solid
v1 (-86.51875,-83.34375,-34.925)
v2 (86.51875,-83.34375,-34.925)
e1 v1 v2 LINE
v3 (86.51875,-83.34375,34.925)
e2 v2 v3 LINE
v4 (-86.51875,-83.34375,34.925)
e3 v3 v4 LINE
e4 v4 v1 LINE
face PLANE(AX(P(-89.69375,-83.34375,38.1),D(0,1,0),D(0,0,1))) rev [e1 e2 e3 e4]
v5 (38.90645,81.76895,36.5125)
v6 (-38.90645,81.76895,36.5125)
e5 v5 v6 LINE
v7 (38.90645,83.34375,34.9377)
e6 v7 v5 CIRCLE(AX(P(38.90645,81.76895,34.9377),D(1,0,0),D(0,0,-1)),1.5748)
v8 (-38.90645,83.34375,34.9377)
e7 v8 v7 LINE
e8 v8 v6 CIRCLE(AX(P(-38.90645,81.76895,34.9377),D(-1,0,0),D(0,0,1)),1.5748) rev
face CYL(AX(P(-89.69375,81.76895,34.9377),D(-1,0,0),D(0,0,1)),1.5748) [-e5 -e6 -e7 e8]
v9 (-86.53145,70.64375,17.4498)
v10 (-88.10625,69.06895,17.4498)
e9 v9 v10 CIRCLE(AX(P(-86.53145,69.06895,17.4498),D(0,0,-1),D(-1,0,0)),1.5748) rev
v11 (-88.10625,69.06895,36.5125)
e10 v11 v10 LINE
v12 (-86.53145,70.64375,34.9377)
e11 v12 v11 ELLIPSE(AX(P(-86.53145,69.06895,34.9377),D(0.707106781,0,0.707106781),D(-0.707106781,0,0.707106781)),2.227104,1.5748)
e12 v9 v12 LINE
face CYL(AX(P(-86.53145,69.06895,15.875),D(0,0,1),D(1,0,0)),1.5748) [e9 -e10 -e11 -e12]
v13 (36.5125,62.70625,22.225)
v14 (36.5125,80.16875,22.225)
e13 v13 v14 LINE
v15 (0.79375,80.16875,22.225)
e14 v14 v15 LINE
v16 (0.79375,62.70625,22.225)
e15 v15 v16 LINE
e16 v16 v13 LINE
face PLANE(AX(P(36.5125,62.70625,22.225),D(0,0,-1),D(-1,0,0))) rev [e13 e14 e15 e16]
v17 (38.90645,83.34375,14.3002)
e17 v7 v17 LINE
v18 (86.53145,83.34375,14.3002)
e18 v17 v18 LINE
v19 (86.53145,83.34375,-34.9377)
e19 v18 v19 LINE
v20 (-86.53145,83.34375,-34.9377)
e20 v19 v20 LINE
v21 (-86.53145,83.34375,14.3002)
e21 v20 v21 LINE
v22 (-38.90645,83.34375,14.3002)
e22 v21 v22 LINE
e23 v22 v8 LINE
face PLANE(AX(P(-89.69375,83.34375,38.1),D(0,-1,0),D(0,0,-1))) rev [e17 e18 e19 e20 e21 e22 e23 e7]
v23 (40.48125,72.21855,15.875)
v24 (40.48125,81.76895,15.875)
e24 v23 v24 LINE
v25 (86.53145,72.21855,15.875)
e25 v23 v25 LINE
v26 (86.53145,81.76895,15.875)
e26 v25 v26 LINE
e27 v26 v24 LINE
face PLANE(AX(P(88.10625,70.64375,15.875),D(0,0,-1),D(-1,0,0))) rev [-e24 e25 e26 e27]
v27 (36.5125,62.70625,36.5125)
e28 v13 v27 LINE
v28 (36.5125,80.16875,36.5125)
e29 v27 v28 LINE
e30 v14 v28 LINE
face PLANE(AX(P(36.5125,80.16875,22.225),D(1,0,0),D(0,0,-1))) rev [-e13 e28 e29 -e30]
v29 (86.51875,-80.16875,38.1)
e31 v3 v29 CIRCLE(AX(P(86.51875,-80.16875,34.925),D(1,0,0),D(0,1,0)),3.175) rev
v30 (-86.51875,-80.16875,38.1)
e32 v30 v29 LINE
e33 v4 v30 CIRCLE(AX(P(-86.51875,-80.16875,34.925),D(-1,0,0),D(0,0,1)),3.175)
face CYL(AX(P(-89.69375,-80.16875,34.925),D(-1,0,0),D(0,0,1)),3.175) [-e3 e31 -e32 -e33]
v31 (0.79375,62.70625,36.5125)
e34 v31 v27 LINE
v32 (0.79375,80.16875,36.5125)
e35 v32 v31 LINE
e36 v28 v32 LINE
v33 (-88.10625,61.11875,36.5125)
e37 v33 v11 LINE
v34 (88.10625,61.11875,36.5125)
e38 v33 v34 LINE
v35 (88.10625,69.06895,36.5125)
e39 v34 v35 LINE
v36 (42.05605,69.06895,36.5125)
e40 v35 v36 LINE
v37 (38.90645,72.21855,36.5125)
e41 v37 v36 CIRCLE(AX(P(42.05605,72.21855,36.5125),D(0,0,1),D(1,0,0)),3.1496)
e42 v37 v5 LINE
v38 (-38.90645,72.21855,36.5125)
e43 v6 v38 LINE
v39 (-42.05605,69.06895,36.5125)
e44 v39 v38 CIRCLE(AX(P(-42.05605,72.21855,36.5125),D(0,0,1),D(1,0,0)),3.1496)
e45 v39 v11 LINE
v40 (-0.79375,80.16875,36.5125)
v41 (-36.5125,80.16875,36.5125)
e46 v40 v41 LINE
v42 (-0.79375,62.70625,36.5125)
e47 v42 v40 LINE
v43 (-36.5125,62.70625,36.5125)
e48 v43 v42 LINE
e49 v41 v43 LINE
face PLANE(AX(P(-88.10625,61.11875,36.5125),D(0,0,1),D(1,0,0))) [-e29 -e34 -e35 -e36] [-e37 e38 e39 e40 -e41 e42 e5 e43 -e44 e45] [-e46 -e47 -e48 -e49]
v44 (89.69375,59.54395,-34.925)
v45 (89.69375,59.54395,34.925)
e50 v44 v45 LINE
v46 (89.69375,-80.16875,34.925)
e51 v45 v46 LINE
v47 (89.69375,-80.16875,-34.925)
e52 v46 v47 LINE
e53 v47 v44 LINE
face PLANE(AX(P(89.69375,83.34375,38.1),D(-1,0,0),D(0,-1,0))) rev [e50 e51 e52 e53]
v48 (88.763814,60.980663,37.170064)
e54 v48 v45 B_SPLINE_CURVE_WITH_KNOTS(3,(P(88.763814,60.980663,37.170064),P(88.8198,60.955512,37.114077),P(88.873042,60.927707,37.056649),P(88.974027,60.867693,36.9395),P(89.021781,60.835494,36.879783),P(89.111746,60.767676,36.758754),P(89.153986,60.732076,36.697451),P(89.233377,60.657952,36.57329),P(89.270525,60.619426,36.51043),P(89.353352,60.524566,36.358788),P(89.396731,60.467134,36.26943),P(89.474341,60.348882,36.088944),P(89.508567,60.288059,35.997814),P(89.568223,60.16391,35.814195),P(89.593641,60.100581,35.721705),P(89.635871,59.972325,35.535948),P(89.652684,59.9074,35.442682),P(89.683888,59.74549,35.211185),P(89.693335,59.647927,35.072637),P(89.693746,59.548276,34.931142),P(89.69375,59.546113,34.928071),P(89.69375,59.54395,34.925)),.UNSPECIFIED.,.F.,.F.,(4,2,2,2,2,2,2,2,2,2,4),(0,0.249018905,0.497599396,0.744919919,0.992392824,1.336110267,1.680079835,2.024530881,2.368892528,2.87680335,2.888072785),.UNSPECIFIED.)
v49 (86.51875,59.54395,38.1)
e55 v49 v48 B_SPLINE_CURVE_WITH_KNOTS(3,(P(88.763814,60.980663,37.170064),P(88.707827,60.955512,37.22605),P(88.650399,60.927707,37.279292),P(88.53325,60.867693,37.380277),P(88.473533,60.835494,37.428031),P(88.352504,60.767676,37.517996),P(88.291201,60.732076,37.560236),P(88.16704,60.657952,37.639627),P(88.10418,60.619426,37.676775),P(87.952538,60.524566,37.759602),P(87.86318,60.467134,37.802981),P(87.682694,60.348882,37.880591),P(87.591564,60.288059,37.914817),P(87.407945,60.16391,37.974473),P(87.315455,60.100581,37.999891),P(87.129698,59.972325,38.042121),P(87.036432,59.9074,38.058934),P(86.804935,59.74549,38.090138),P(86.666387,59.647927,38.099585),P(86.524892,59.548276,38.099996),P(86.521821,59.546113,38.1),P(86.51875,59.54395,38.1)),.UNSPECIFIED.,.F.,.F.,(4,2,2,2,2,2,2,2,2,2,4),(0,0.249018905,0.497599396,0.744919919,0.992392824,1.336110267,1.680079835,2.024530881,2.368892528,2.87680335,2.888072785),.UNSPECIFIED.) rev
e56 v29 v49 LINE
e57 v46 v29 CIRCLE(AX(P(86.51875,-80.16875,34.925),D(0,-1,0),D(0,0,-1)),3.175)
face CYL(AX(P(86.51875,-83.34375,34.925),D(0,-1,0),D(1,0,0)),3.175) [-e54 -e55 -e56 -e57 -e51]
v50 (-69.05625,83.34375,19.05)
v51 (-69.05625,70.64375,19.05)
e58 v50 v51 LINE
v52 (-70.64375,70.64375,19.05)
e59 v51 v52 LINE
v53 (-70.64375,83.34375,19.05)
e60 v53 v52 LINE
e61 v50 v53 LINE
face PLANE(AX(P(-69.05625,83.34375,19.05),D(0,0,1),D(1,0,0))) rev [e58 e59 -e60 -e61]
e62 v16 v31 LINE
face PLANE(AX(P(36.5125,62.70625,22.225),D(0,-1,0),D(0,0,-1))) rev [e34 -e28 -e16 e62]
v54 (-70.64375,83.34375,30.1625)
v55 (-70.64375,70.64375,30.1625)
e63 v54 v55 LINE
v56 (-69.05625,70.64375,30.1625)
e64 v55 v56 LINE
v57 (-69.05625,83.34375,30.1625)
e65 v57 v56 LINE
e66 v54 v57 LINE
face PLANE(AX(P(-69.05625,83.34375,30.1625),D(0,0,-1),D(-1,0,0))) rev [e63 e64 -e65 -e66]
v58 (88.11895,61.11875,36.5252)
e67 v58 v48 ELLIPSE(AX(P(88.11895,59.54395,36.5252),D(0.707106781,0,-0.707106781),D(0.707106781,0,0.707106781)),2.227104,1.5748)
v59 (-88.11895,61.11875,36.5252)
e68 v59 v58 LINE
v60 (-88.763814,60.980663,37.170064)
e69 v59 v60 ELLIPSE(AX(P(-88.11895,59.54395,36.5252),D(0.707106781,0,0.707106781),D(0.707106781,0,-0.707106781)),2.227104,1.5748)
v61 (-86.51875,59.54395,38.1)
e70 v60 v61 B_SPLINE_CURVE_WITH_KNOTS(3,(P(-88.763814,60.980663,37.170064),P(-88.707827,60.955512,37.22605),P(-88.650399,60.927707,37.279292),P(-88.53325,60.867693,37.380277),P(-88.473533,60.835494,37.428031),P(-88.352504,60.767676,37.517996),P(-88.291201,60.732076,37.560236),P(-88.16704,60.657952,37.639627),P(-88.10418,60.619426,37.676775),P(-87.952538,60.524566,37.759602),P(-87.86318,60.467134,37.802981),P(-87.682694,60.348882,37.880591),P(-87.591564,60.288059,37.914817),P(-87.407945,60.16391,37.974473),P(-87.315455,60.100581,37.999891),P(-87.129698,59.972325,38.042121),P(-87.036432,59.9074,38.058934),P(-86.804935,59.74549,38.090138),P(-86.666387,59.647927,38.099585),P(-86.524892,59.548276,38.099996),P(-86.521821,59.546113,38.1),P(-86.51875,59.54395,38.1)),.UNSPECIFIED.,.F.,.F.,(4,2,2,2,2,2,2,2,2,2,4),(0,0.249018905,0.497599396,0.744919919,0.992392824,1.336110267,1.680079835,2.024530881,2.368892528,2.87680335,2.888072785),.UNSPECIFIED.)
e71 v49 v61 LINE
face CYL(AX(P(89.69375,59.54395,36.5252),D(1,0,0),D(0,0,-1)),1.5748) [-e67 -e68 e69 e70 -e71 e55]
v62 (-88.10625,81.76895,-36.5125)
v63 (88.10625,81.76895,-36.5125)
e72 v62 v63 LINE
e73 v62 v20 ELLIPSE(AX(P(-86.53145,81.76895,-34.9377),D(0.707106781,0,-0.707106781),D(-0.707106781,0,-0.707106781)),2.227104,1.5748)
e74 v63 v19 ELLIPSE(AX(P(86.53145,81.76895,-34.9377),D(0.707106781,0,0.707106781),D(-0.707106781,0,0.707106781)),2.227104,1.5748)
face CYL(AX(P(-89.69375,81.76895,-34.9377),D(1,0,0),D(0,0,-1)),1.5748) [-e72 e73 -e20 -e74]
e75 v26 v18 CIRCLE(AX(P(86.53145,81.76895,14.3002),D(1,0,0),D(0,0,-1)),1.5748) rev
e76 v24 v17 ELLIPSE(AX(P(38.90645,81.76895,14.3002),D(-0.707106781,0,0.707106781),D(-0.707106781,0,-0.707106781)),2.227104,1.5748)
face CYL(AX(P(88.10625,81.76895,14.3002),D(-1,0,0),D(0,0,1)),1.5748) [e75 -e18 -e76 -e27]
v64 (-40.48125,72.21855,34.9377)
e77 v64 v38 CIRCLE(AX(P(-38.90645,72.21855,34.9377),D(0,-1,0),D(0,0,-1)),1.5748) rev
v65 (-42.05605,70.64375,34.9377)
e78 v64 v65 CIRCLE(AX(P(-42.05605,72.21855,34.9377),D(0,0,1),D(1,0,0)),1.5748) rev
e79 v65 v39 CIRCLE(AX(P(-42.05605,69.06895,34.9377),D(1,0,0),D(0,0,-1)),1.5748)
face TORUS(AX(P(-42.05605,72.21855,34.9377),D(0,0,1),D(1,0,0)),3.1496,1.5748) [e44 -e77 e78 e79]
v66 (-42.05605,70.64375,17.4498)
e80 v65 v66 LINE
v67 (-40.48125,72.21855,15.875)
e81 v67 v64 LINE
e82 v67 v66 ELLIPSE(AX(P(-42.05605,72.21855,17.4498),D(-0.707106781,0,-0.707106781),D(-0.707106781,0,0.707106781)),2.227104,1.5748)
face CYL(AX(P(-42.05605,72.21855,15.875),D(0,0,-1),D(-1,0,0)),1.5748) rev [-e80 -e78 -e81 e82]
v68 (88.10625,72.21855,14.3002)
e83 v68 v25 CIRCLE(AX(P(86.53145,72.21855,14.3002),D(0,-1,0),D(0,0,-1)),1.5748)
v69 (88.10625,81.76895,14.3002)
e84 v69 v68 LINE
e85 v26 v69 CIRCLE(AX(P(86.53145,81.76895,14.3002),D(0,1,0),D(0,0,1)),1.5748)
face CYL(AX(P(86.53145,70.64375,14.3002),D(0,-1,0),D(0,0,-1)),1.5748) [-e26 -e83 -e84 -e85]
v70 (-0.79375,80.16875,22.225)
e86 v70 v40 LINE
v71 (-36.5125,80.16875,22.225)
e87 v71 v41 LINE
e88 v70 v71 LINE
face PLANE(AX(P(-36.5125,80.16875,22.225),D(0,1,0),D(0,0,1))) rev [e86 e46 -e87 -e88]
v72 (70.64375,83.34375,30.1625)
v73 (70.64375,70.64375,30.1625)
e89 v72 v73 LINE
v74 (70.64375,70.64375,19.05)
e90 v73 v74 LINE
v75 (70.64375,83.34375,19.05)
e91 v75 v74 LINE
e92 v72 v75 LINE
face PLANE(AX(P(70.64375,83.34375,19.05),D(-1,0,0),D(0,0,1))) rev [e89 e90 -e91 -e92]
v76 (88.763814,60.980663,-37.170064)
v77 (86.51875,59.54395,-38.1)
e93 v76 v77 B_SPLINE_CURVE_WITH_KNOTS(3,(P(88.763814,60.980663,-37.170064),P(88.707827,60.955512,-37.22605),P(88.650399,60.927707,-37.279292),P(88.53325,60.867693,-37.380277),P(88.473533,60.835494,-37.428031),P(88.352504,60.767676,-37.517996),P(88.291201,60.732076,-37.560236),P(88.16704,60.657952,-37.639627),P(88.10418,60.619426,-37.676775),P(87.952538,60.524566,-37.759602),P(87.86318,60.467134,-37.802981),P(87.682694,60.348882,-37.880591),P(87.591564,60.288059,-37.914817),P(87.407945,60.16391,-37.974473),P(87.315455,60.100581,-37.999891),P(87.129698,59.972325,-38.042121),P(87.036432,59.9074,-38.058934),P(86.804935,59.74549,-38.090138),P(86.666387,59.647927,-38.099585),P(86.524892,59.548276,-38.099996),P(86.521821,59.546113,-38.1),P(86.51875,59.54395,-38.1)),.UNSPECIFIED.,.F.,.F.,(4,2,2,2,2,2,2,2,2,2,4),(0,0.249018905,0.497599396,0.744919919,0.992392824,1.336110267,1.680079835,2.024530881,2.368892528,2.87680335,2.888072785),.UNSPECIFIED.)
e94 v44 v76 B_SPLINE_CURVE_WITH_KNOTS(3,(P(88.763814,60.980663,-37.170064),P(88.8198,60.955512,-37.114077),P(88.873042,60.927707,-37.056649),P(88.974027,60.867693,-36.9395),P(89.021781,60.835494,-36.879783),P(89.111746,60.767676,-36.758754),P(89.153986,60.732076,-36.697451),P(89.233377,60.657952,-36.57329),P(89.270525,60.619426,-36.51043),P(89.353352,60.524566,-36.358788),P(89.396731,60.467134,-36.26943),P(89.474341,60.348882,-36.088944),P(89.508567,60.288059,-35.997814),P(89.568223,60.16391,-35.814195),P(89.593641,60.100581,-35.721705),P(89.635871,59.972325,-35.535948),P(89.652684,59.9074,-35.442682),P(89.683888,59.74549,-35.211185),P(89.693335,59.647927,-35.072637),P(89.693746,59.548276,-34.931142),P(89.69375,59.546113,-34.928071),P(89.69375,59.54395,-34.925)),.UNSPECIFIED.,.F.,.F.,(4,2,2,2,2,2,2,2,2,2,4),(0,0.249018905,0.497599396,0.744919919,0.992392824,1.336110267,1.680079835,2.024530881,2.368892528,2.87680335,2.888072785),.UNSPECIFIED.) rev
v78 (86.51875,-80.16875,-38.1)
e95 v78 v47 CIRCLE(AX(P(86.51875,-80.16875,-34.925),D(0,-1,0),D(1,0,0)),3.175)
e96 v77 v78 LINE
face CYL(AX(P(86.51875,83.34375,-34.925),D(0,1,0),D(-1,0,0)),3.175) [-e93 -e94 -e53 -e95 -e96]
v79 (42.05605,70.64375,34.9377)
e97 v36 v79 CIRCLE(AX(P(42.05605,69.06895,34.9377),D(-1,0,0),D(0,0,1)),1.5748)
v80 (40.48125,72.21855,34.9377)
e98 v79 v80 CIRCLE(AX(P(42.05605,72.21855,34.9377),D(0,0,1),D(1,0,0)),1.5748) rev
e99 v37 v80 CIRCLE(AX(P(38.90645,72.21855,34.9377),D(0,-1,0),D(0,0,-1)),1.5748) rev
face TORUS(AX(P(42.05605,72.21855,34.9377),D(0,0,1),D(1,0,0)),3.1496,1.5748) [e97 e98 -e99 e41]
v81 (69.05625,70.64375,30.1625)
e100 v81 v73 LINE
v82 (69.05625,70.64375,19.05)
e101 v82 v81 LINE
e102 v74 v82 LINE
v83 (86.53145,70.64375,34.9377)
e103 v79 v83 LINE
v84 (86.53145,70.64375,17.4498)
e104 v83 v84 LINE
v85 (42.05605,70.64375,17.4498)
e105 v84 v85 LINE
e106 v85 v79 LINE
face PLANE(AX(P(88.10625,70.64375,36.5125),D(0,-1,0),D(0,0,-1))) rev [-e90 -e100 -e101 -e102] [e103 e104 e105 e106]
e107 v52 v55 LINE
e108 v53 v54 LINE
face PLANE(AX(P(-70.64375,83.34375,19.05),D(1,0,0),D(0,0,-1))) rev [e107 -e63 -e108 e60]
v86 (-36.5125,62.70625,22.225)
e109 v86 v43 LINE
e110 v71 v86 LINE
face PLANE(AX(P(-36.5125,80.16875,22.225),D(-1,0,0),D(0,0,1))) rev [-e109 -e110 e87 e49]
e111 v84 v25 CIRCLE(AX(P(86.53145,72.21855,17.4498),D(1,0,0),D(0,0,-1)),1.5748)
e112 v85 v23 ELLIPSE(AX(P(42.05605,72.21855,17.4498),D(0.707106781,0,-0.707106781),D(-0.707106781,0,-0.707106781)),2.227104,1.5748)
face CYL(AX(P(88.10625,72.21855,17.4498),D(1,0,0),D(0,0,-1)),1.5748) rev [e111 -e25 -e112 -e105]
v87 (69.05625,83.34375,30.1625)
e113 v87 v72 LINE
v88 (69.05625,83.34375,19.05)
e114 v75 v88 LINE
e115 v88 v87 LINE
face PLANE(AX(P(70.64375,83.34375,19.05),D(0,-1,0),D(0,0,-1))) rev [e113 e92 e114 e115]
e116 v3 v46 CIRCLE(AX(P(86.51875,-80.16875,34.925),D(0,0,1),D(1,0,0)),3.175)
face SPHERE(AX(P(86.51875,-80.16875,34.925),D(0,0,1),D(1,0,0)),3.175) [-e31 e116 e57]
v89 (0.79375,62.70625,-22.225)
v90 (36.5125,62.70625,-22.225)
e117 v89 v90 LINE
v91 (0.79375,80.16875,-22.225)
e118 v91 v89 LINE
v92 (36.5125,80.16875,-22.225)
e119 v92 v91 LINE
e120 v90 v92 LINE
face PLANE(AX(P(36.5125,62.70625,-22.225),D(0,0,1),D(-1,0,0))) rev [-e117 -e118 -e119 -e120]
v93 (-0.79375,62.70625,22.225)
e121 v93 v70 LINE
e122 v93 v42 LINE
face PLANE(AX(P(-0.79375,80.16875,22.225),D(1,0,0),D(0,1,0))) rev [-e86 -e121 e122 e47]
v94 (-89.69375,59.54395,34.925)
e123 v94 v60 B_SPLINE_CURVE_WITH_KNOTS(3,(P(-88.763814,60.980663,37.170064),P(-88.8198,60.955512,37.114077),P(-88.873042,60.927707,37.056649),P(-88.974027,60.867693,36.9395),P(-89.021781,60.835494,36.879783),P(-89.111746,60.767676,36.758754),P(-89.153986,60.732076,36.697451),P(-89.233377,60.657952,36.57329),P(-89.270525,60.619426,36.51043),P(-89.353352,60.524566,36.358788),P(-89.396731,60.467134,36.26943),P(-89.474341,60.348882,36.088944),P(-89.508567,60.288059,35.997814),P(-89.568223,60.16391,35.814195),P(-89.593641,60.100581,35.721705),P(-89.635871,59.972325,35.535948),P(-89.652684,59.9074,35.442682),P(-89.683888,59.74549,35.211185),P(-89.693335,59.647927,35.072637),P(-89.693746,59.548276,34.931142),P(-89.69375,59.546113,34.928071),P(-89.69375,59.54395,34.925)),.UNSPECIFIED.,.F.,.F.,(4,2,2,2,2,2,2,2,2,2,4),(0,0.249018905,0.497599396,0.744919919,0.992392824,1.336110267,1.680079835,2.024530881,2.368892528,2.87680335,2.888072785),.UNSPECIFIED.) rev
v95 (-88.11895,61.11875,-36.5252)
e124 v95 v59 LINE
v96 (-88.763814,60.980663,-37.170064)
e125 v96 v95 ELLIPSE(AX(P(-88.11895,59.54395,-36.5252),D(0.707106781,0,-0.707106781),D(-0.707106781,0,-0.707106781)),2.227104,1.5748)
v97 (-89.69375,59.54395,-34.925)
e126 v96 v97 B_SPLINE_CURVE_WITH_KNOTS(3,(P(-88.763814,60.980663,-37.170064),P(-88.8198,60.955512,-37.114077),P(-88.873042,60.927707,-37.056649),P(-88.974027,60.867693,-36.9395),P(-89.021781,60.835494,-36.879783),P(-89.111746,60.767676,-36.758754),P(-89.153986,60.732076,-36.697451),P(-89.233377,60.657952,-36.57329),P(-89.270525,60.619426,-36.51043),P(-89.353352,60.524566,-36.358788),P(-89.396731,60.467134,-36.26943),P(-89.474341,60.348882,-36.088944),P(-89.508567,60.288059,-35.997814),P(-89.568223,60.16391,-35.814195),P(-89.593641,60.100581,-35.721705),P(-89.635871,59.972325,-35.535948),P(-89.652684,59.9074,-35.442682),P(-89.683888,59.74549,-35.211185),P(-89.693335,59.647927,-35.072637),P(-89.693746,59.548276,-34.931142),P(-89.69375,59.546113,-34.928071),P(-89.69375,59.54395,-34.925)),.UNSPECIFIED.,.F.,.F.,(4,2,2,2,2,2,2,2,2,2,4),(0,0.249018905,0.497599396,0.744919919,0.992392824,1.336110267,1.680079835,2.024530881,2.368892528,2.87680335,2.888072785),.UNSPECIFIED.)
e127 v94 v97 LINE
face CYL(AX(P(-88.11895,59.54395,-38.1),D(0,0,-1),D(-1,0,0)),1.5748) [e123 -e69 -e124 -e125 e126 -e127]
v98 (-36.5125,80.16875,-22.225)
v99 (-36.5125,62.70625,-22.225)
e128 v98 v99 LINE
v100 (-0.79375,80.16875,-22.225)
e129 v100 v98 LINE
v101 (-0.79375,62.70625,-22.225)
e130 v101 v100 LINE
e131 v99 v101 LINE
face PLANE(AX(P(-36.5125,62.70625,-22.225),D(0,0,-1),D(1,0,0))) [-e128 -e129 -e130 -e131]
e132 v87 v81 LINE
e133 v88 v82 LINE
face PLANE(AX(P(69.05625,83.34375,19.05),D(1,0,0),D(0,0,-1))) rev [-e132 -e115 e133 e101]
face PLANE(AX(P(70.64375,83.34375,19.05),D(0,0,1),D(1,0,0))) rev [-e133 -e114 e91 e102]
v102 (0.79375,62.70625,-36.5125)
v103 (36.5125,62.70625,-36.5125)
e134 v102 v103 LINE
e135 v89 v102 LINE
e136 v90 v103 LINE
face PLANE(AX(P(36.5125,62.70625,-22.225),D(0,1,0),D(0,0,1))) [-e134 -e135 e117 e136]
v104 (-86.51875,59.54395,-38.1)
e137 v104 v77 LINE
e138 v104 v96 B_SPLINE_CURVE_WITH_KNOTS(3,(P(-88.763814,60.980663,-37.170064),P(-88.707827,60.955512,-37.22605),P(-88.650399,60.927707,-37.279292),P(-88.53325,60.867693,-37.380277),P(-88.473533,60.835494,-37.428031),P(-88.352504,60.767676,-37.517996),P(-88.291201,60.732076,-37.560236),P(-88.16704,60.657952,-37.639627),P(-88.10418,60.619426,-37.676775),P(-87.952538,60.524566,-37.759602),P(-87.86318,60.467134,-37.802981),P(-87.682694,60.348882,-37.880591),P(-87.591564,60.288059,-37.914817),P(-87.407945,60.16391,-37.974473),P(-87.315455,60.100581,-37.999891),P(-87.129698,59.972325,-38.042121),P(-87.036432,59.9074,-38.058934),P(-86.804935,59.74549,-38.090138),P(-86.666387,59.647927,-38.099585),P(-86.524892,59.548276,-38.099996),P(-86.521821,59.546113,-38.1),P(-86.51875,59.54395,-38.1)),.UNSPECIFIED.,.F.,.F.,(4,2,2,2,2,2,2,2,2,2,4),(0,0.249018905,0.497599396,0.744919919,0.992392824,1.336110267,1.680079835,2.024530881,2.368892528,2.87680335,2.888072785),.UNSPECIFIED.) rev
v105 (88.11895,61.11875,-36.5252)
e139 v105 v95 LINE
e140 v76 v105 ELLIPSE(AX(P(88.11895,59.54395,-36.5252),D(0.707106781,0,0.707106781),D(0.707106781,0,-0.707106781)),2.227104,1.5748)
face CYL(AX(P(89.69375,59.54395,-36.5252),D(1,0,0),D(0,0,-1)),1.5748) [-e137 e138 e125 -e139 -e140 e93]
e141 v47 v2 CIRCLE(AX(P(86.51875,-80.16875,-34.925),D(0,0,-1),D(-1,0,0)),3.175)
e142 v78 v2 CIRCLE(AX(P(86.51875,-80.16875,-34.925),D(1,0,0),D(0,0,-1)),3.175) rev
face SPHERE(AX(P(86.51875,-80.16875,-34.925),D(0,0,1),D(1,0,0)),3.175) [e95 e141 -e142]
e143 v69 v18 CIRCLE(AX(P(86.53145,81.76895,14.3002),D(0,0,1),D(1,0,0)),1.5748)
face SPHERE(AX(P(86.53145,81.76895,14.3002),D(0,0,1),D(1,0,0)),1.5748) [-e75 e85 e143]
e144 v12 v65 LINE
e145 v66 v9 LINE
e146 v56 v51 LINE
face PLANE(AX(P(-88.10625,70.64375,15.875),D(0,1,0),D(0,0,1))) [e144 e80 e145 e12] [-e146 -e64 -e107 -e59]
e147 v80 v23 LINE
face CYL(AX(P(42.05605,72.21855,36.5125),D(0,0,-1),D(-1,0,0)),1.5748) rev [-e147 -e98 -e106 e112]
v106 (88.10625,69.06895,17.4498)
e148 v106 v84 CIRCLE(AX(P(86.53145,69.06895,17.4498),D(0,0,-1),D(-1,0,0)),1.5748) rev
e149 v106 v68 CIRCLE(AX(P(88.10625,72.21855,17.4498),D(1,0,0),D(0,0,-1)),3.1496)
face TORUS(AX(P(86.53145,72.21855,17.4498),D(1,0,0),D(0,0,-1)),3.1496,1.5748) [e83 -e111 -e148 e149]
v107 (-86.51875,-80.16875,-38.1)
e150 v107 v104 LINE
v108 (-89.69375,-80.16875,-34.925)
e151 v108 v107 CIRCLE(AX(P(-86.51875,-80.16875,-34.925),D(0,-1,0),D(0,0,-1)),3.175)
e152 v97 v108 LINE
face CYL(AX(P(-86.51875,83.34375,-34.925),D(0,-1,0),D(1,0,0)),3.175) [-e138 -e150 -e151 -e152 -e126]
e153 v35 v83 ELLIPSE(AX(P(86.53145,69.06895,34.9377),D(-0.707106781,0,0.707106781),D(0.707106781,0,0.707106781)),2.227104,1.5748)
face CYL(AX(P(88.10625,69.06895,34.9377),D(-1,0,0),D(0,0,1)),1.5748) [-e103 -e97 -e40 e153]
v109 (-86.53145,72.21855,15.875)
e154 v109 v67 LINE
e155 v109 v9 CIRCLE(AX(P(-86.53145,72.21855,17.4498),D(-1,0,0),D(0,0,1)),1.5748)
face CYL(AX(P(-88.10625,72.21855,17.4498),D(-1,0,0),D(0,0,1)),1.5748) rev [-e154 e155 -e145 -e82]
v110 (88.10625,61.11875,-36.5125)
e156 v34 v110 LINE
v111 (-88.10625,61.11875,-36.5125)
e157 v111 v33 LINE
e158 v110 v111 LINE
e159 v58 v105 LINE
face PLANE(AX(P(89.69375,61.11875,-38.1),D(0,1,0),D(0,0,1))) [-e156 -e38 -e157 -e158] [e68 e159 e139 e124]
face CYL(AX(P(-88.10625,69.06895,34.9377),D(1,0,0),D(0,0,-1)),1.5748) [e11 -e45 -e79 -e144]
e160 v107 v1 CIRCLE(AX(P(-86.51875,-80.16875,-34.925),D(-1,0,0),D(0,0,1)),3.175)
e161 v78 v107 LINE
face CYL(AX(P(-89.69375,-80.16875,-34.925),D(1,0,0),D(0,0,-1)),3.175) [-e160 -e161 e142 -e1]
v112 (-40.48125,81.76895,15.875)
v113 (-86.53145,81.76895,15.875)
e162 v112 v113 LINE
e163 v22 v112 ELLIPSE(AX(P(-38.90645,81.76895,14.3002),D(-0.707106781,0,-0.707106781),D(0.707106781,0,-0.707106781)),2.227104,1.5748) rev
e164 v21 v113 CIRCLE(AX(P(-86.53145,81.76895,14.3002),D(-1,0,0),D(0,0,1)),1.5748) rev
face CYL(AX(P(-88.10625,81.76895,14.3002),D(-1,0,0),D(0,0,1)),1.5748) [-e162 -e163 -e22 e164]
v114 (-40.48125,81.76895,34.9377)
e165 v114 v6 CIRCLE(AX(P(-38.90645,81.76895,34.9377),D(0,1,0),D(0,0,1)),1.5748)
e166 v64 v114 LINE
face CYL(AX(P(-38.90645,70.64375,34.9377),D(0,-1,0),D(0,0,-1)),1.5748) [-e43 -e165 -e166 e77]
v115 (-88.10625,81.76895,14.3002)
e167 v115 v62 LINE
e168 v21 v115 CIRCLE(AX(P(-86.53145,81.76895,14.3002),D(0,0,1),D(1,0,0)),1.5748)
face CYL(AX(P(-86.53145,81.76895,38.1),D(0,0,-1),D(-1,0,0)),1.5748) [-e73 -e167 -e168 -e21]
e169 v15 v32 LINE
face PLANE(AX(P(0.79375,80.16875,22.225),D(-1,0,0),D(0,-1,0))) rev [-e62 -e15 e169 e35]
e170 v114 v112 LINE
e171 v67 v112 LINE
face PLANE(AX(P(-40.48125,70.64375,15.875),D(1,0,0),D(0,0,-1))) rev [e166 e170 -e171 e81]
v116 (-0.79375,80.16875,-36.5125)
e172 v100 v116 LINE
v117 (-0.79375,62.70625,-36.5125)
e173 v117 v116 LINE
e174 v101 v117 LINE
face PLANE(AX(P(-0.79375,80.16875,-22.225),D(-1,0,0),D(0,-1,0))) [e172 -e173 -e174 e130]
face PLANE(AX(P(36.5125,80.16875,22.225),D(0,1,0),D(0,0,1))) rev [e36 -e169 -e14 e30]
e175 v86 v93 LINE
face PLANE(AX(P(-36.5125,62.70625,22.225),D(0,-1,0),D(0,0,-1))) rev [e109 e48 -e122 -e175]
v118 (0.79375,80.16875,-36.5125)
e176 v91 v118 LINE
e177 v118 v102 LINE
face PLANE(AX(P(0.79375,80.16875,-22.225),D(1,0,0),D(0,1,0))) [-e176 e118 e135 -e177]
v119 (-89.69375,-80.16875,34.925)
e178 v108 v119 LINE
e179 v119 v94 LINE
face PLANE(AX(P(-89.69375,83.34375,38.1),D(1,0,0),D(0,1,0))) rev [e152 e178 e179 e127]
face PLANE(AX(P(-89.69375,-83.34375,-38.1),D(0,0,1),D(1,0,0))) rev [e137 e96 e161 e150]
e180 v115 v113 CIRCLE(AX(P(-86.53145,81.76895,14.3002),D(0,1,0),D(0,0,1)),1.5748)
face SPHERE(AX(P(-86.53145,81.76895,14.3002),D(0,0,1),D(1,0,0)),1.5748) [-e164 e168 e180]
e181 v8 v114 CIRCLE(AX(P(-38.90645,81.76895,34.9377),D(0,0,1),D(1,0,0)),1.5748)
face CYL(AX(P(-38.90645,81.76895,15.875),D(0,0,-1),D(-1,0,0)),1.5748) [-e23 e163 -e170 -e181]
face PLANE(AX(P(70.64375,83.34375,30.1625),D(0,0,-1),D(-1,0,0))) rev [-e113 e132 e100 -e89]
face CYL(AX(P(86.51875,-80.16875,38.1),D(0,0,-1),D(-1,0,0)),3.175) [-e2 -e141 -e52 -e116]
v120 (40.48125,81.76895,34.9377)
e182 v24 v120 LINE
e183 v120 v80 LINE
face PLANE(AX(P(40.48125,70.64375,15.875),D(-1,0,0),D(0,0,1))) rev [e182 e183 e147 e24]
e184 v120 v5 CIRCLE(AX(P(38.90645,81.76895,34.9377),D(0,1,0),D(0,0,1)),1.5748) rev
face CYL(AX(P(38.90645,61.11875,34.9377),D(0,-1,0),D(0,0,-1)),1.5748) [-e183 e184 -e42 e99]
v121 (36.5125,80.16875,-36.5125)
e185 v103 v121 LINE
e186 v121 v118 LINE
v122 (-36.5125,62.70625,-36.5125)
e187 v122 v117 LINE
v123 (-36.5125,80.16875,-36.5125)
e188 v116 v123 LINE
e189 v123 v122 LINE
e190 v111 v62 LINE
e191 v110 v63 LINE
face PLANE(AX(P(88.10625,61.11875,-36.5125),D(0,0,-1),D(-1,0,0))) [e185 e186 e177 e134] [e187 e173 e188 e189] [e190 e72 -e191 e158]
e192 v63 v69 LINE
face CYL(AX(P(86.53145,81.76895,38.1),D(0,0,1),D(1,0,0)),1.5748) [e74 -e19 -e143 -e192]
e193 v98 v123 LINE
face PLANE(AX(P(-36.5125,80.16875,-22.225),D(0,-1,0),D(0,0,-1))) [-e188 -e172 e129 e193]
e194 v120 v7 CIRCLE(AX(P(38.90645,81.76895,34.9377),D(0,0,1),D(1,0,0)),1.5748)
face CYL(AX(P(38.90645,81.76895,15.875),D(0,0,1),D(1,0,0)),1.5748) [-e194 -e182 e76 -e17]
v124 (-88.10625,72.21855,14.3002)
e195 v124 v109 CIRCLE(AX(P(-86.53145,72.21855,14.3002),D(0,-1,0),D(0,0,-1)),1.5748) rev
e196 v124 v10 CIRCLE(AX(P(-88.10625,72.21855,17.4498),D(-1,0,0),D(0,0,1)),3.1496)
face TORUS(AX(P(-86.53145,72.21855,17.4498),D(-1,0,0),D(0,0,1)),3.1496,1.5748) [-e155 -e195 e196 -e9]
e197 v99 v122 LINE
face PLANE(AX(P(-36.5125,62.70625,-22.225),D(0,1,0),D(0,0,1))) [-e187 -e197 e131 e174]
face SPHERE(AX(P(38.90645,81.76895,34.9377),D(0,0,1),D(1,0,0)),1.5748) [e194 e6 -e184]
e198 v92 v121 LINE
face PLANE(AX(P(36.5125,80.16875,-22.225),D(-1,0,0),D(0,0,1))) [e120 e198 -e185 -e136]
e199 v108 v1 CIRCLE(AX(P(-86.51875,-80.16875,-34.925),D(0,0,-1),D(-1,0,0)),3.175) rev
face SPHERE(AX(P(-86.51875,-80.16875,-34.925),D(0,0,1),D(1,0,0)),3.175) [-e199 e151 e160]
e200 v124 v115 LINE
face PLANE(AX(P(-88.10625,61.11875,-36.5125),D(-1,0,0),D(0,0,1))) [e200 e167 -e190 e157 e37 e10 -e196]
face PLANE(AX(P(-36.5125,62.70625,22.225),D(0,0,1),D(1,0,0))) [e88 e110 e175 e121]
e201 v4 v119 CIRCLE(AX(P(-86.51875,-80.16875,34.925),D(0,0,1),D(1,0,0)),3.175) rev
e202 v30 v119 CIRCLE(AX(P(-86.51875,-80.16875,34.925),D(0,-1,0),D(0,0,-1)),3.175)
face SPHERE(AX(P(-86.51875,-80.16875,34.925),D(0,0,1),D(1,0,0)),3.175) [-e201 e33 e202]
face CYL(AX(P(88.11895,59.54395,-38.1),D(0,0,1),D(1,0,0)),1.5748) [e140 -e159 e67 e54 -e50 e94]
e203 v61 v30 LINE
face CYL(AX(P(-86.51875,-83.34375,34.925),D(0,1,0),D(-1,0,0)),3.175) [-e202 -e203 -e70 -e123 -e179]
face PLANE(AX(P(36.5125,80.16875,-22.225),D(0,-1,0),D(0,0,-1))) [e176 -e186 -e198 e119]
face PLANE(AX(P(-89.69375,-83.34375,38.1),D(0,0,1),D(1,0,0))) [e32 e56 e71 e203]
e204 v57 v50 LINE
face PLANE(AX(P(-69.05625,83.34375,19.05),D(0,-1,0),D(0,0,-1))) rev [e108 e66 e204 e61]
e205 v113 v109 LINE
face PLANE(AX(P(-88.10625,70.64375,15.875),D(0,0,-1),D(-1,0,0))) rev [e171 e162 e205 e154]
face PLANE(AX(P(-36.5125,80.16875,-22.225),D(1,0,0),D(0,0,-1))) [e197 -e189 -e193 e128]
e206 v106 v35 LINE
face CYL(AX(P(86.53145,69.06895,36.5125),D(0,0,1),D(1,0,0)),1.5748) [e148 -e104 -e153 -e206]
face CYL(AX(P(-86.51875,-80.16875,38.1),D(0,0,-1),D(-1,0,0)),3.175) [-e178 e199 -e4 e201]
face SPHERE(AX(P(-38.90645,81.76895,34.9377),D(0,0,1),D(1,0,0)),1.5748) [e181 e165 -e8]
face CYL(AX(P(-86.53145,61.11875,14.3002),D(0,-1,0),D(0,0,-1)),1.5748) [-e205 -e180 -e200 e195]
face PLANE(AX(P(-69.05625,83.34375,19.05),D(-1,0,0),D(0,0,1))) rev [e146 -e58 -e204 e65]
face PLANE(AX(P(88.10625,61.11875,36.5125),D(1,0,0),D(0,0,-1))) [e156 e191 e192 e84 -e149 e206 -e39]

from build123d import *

# Parameters (mm, degrees)
SKETCH1_W          = 179.3875
SKETCH1_H          = 166.6875
EXTRUDE1_DEPTH     = 38.1
SKETCH2_W          = 179.3875
SKETCH2_H          = 76.2
SKETCH2_W_2        = 176.2125
SKETCH2_H_2        = 73.025
CUT_EXTRUDE1_DEPTH = 22.225
SKETCH3_W          = 47.625
SKETCH3_H          = 20.6375
CUT_EXTRUDE2_DEPTH = 12.7
SKETCH4_W          = 35.71875
SKETCH4_H          = 17.4625
CUT_EXTRUDE3_DEPTH = 14.2875
FILLET1_R          = 1.5748
FILLET2_R          = 3.175
SKETCH5_W          = 1.5875
SKETCH5_H          = 11.1125
EXTRUDE3_DEPTH     = 12.7


with BuildPart() as part:
    # Sketch1 → Extrude1 (new, symmetric)
    with BuildSketch(Plane.XY):
        Rectangle(SKETCH1_W, SKETCH1_H)
    extrude(amount=EXTRUDE1_DEPTH, both=True)

    # Sketch2 → Cut-Extrude1 (cut)
    with BuildSketch(Plane(origin=(0, 83.34375, 0), x_dir=(-1, 0, 0), z_dir=(0, 1, 0))):
        Rectangle(SKETCH2_W, SKETCH2_H)
        Rectangle(SKETCH2_W_2, SKETCH2_H_2, mode=Mode.SUBTRACT)
    extrude(amount=-CUT_EXTRUDE1_DEPTH, mode=Mode.SUBTRACT)

    # Sketch3 → Cut-Extrude2 (cut)
    with BuildSketch(Plane(origin=(0, 83.34375, 0), x_dir=(-1, 0, 0), z_dir=(0, 1, 0))):
        with Locations((-64.29375, 26.19375)):
            Rectangle(SKETCH3_W, SKETCH3_H)
        with Locations((64.29375, 26.19375)):
            Rectangle(SKETCH3_W, SKETCH3_H)
    extrude(amount=-CUT_EXTRUDE2_DEPTH, mode=Mode.SUBTRACT)

    # Sketch4 → Cut-Extrude3 (cut)
    with BuildSketch(Plane.XY.offset(36.5125)):
        with Locations((-18.653125, 71.4375)):
            Rectangle(SKETCH4_W, SKETCH4_H)
        with Locations((18.653125, 71.4375)):
            Rectangle(SKETCH4_W, SKETCH4_H)
    cut_extrude3 = extrude(amount=-CUT_EXTRUDE3_DEPTH, mode=Mode.SUBTRACT)

    # Mirror1: Cut-Extrude3 across plane
    add(cut_extrude3.mirror(Plane.XY), mode=Mode.SUBTRACT)

    # Fillet1
    fillet1_edges = [part.edges().sort_by_distance(p)[0] for p in [
        (89.69375, 61.11875, 0),
        (0, 61.11875, 38.1),
        (-89.69375, 61.11875, 0),
        (0, 61.11875, -38.1),
        (0, 83.34375, -36.5125),
        (-88.10625, 83.34375, -10.31875),
        (88.10625, 83.34375, -10.31875),
        (88.10625, 70.64375, 26.19375),
        (88.10625, 76.99375, 15.875),
        (64.29375, 70.64375, 36.5125),
        (40.48125, 70.64375, 26.19375),
        (40.48125, 76.99375, 36.5125),
        (64.29375, 70.64375, 15.875),
        (64.29375, 83.34375, 15.875),
        (40.48125, 83.34375, 26.19375),
        (0, 83.34375, 36.5125),
        (-88.10625, 70.64375, 26.19375),
        (-64.29375, 70.64375, 15.875),
        (-88.10625, 76.99375, 15.875),
        (-40.48125, 70.64375, 26.19375),
        (-64.29375, 70.64375, 36.5125),
        (-40.48125, 76.99375, 36.5125),
        (-40.48125, 83.34375, 26.19375),
        (-64.29375, 83.34375, 15.875),
    ]]
    fillet(fillet1_edges, radius=FILLET1_R)

    # Fillet2
    # the kernel refuses this fillet: 3.175 mm, written as the material it takes off along each edge
    with BuildSketch(Plane(origin=(-86.51875, -80.16875, -34.925), x_dir=(-1, 0, 0), z_dir=(0, 0, -1))) as fillet2_piece_1_section:
        Polygon((0, 0), (FILLET2_R * 1.02, 0), (FILLET2_R * 1.02, -FILLET2_R * 1.02), (0, -FILLET2_R * 1.02), align=None)
    fillet2_piece_1 = extrude(amount=FILLET2_R * 1.02, mode=Mode.PRIVATE)
    fillet2_piece_1 = fillet2_piece_1 - Plane(origin=(-86.51875, -80.16875, -34.925), x_dir=(0.7071067811865475, 0.7071067811865477, 0), z_dir=(0, 0, -1)) * Sphere(FILLET2_R, mode=Mode.PRIVATE)
    add(fillet2_piece_1, mode=Mode.SUBTRACT)
    with BuildSketch(Plane(origin=(-86.51875, -80.16875, 34.925), x_dir=(-1, 0, 0), z_dir=(0, 0, 1))) as fillet2_piece_2_section:
        Polygon((0, 0), (FILLET2_R * 1.02, 0), (FILLET2_R * 1.02, FILLET2_R * 1.02), (0, FILLET2_R * 1.02), align=None)
    fillet2_piece_2 = extrude(amount=FILLET2_R * 1.02, mode=Mode.PRIVATE)
    fillet2_piece_2 = fillet2_piece_2 - Plane(origin=(-86.51875, -80.16875, 34.925), x_dir=(0.7071067811865475, 0.7071067811865477, 0), z_dir=(0, 0, 1)) * Sphere(FILLET2_R, mode=Mode.PRIVATE)
    add(fillet2_piece_2, mode=Mode.SUBTRACT)
    with BuildSketch(Plane(origin=(86.51875, -80.16875, 34.925), x_dir=(0, 0, 1), z_dir=(1, 0, 0))) as fillet2_piece_3_section:
        Polygon((0, 0), (FILLET2_R * 1.02, 0), (FILLET2_R * 1.02, FILLET2_R * 1.02), (0, FILLET2_R * 1.02), align=None)
    fillet2_piece_3 = extrude(amount=FILLET2_R * 1.02, mode=Mode.PRIVATE)
    fillet2_piece_3 = fillet2_piece_3 - Plane(origin=(86.51875, -80.16875, 34.925), x_dir=(0, 0.7071067811865475, -0.7071067811865475), z_dir=(1, 0, 0)) * Sphere(FILLET2_R, mode=Mode.PRIVATE)
    add(fillet2_piece_3, mode=Mode.SUBTRACT)
    with BuildSketch(Plane(origin=(86.51875, -80.16875, -34.925), x_dir=(0, 0, -1), z_dir=(1, 0, 0))) as fillet2_piece_4_section:
        Polygon((0, 0), (FILLET2_R * 1.02, 0), (FILLET2_R * 1.02, -FILLET2_R * 1.02), (0, -FILLET2_R * 1.02), align=None)
    fillet2_piece_4 = extrude(amount=FILLET2_R * 1.02, mode=Mode.PRIVATE)
    fillet2_piece_4 = fillet2_piece_4 - Plane(origin=(86.51875, -80.16875, -34.925), x_dir=(0, 0.7071067811865475, 0.7071067811865475), z_dir=(1, 0, 0)) * Sphere(FILLET2_R, mode=Mode.PRIVATE)
    add(fillet2_piece_4, mode=Mode.SUBTRACT)
    with BuildSketch(Plane(origin=(-89.69375, -83.34375, -34.925), x_dir=(0, 1, 0), z_dir=(0, 0, 1)), Plane(origin=(89.69375, -83.34375, 34.925), x_dir=(0, 1, 0), z_dir=(0, 0, -1))) as fillet2_piece_5:
        with BuildLine():
            CenterArc((FILLET2_R, -FILLET2_R), FILLET2_R, 90, 90)
            Line((0, -FILLET2_R), (0, 0))
            Line((0, 0), (FILLET2_R, 0))
        make_face()
    extrude(amount=69.85, mode=Mode.SUBTRACT)
    with BuildSketch(Plane(origin=(86.51875, -83.34375, 38.1), x_dir=(0, 1, 0), z_dir=(-1, 0, 0))) as fillet2_piece_6:
        with BuildLine():
            CenterArc((FILLET2_R, FILLET2_R), FILLET2_R, 180, 90)
            Line((0, FILLET2_R), (0, 0))
            Line((0, 0), (FILLET2_R, 0))
        make_face()
    extrude(amount=173.0375, mode=Mode.SUBTRACT)
    with BuildSketch(Plane(origin=(86.51875, -83.34375, -38.1), x_dir=(0, 1, 0), z_dir=(-1, 0, 0))) as fillet2_piece_7:
        with BuildLine():
            CenterArc((FILLET2_R, -FILLET2_R), FILLET2_R, 90, 90)
            Line((0, -FILLET2_R), (0, 0))
            Line((0, 0), (FILLET2_R, 0))
        make_face()
    extrude(amount=173.0375, mode=Mode.SUBTRACT)
    with BuildSketch(Plane(origin=(-89.69375, -80.16875, 38.1), x_dir=(1, 0, 0), z_dir=(0, 1, 0)), Plane(origin=(89.69375, 67.48145, -38.1), x_dir=(0, 0, 1), z_dir=(0, -1, 0))) as fillet2_piece_8:
        with BuildLine():
            CenterArc((FILLET2_R, FILLET2_R), FILLET2_R, 180, 90)
            Line((0, FILLET2_R), (0, 0))
            Line((0, 0), (FILLET2_R, 0))
        make_face()
    extrude(amount=147.6502, mode=Mode.SUBTRACT)
    with BuildSketch(Plane(origin=(-89.69375, -80.16875, -38.1), x_dir=(1, 0, 0), z_dir=(0, 1, 0)), Plane(origin=(89.69375, 67.48145, 38.1), x_dir=(0, 0, -1), z_dir=(0, -1, 0))) as fillet2_piece_9:
        with BuildLine():
            CenterArc((FILLET2_R, -FILLET2_R), FILLET2_R, 90, 90)
            Line((0, -FILLET2_R), (0, 0))
            Line((0, 0), (FILLET2_R, 0))
        make_face()
    extrude(amount=147.6502, mode=Mode.SUBTRACT)

    # Sketch5 → Extrude3 (add)
    with BuildSketch(Plane(origin=(0, 70.64375, 0), x_dir=(-1, 0, 0), z_dir=(0, 1, 0))):
        with Locations((-69.85, 24.60625)):
            Rectangle(SKETCH5_W, SKETCH5_H)
        with Locations((69.85, 24.60625)):
            Rectangle(SKETCH5_W, SKETCH5_H)
    extrude(amount=EXTRUDE3_DEPTH)


solid = part.part
